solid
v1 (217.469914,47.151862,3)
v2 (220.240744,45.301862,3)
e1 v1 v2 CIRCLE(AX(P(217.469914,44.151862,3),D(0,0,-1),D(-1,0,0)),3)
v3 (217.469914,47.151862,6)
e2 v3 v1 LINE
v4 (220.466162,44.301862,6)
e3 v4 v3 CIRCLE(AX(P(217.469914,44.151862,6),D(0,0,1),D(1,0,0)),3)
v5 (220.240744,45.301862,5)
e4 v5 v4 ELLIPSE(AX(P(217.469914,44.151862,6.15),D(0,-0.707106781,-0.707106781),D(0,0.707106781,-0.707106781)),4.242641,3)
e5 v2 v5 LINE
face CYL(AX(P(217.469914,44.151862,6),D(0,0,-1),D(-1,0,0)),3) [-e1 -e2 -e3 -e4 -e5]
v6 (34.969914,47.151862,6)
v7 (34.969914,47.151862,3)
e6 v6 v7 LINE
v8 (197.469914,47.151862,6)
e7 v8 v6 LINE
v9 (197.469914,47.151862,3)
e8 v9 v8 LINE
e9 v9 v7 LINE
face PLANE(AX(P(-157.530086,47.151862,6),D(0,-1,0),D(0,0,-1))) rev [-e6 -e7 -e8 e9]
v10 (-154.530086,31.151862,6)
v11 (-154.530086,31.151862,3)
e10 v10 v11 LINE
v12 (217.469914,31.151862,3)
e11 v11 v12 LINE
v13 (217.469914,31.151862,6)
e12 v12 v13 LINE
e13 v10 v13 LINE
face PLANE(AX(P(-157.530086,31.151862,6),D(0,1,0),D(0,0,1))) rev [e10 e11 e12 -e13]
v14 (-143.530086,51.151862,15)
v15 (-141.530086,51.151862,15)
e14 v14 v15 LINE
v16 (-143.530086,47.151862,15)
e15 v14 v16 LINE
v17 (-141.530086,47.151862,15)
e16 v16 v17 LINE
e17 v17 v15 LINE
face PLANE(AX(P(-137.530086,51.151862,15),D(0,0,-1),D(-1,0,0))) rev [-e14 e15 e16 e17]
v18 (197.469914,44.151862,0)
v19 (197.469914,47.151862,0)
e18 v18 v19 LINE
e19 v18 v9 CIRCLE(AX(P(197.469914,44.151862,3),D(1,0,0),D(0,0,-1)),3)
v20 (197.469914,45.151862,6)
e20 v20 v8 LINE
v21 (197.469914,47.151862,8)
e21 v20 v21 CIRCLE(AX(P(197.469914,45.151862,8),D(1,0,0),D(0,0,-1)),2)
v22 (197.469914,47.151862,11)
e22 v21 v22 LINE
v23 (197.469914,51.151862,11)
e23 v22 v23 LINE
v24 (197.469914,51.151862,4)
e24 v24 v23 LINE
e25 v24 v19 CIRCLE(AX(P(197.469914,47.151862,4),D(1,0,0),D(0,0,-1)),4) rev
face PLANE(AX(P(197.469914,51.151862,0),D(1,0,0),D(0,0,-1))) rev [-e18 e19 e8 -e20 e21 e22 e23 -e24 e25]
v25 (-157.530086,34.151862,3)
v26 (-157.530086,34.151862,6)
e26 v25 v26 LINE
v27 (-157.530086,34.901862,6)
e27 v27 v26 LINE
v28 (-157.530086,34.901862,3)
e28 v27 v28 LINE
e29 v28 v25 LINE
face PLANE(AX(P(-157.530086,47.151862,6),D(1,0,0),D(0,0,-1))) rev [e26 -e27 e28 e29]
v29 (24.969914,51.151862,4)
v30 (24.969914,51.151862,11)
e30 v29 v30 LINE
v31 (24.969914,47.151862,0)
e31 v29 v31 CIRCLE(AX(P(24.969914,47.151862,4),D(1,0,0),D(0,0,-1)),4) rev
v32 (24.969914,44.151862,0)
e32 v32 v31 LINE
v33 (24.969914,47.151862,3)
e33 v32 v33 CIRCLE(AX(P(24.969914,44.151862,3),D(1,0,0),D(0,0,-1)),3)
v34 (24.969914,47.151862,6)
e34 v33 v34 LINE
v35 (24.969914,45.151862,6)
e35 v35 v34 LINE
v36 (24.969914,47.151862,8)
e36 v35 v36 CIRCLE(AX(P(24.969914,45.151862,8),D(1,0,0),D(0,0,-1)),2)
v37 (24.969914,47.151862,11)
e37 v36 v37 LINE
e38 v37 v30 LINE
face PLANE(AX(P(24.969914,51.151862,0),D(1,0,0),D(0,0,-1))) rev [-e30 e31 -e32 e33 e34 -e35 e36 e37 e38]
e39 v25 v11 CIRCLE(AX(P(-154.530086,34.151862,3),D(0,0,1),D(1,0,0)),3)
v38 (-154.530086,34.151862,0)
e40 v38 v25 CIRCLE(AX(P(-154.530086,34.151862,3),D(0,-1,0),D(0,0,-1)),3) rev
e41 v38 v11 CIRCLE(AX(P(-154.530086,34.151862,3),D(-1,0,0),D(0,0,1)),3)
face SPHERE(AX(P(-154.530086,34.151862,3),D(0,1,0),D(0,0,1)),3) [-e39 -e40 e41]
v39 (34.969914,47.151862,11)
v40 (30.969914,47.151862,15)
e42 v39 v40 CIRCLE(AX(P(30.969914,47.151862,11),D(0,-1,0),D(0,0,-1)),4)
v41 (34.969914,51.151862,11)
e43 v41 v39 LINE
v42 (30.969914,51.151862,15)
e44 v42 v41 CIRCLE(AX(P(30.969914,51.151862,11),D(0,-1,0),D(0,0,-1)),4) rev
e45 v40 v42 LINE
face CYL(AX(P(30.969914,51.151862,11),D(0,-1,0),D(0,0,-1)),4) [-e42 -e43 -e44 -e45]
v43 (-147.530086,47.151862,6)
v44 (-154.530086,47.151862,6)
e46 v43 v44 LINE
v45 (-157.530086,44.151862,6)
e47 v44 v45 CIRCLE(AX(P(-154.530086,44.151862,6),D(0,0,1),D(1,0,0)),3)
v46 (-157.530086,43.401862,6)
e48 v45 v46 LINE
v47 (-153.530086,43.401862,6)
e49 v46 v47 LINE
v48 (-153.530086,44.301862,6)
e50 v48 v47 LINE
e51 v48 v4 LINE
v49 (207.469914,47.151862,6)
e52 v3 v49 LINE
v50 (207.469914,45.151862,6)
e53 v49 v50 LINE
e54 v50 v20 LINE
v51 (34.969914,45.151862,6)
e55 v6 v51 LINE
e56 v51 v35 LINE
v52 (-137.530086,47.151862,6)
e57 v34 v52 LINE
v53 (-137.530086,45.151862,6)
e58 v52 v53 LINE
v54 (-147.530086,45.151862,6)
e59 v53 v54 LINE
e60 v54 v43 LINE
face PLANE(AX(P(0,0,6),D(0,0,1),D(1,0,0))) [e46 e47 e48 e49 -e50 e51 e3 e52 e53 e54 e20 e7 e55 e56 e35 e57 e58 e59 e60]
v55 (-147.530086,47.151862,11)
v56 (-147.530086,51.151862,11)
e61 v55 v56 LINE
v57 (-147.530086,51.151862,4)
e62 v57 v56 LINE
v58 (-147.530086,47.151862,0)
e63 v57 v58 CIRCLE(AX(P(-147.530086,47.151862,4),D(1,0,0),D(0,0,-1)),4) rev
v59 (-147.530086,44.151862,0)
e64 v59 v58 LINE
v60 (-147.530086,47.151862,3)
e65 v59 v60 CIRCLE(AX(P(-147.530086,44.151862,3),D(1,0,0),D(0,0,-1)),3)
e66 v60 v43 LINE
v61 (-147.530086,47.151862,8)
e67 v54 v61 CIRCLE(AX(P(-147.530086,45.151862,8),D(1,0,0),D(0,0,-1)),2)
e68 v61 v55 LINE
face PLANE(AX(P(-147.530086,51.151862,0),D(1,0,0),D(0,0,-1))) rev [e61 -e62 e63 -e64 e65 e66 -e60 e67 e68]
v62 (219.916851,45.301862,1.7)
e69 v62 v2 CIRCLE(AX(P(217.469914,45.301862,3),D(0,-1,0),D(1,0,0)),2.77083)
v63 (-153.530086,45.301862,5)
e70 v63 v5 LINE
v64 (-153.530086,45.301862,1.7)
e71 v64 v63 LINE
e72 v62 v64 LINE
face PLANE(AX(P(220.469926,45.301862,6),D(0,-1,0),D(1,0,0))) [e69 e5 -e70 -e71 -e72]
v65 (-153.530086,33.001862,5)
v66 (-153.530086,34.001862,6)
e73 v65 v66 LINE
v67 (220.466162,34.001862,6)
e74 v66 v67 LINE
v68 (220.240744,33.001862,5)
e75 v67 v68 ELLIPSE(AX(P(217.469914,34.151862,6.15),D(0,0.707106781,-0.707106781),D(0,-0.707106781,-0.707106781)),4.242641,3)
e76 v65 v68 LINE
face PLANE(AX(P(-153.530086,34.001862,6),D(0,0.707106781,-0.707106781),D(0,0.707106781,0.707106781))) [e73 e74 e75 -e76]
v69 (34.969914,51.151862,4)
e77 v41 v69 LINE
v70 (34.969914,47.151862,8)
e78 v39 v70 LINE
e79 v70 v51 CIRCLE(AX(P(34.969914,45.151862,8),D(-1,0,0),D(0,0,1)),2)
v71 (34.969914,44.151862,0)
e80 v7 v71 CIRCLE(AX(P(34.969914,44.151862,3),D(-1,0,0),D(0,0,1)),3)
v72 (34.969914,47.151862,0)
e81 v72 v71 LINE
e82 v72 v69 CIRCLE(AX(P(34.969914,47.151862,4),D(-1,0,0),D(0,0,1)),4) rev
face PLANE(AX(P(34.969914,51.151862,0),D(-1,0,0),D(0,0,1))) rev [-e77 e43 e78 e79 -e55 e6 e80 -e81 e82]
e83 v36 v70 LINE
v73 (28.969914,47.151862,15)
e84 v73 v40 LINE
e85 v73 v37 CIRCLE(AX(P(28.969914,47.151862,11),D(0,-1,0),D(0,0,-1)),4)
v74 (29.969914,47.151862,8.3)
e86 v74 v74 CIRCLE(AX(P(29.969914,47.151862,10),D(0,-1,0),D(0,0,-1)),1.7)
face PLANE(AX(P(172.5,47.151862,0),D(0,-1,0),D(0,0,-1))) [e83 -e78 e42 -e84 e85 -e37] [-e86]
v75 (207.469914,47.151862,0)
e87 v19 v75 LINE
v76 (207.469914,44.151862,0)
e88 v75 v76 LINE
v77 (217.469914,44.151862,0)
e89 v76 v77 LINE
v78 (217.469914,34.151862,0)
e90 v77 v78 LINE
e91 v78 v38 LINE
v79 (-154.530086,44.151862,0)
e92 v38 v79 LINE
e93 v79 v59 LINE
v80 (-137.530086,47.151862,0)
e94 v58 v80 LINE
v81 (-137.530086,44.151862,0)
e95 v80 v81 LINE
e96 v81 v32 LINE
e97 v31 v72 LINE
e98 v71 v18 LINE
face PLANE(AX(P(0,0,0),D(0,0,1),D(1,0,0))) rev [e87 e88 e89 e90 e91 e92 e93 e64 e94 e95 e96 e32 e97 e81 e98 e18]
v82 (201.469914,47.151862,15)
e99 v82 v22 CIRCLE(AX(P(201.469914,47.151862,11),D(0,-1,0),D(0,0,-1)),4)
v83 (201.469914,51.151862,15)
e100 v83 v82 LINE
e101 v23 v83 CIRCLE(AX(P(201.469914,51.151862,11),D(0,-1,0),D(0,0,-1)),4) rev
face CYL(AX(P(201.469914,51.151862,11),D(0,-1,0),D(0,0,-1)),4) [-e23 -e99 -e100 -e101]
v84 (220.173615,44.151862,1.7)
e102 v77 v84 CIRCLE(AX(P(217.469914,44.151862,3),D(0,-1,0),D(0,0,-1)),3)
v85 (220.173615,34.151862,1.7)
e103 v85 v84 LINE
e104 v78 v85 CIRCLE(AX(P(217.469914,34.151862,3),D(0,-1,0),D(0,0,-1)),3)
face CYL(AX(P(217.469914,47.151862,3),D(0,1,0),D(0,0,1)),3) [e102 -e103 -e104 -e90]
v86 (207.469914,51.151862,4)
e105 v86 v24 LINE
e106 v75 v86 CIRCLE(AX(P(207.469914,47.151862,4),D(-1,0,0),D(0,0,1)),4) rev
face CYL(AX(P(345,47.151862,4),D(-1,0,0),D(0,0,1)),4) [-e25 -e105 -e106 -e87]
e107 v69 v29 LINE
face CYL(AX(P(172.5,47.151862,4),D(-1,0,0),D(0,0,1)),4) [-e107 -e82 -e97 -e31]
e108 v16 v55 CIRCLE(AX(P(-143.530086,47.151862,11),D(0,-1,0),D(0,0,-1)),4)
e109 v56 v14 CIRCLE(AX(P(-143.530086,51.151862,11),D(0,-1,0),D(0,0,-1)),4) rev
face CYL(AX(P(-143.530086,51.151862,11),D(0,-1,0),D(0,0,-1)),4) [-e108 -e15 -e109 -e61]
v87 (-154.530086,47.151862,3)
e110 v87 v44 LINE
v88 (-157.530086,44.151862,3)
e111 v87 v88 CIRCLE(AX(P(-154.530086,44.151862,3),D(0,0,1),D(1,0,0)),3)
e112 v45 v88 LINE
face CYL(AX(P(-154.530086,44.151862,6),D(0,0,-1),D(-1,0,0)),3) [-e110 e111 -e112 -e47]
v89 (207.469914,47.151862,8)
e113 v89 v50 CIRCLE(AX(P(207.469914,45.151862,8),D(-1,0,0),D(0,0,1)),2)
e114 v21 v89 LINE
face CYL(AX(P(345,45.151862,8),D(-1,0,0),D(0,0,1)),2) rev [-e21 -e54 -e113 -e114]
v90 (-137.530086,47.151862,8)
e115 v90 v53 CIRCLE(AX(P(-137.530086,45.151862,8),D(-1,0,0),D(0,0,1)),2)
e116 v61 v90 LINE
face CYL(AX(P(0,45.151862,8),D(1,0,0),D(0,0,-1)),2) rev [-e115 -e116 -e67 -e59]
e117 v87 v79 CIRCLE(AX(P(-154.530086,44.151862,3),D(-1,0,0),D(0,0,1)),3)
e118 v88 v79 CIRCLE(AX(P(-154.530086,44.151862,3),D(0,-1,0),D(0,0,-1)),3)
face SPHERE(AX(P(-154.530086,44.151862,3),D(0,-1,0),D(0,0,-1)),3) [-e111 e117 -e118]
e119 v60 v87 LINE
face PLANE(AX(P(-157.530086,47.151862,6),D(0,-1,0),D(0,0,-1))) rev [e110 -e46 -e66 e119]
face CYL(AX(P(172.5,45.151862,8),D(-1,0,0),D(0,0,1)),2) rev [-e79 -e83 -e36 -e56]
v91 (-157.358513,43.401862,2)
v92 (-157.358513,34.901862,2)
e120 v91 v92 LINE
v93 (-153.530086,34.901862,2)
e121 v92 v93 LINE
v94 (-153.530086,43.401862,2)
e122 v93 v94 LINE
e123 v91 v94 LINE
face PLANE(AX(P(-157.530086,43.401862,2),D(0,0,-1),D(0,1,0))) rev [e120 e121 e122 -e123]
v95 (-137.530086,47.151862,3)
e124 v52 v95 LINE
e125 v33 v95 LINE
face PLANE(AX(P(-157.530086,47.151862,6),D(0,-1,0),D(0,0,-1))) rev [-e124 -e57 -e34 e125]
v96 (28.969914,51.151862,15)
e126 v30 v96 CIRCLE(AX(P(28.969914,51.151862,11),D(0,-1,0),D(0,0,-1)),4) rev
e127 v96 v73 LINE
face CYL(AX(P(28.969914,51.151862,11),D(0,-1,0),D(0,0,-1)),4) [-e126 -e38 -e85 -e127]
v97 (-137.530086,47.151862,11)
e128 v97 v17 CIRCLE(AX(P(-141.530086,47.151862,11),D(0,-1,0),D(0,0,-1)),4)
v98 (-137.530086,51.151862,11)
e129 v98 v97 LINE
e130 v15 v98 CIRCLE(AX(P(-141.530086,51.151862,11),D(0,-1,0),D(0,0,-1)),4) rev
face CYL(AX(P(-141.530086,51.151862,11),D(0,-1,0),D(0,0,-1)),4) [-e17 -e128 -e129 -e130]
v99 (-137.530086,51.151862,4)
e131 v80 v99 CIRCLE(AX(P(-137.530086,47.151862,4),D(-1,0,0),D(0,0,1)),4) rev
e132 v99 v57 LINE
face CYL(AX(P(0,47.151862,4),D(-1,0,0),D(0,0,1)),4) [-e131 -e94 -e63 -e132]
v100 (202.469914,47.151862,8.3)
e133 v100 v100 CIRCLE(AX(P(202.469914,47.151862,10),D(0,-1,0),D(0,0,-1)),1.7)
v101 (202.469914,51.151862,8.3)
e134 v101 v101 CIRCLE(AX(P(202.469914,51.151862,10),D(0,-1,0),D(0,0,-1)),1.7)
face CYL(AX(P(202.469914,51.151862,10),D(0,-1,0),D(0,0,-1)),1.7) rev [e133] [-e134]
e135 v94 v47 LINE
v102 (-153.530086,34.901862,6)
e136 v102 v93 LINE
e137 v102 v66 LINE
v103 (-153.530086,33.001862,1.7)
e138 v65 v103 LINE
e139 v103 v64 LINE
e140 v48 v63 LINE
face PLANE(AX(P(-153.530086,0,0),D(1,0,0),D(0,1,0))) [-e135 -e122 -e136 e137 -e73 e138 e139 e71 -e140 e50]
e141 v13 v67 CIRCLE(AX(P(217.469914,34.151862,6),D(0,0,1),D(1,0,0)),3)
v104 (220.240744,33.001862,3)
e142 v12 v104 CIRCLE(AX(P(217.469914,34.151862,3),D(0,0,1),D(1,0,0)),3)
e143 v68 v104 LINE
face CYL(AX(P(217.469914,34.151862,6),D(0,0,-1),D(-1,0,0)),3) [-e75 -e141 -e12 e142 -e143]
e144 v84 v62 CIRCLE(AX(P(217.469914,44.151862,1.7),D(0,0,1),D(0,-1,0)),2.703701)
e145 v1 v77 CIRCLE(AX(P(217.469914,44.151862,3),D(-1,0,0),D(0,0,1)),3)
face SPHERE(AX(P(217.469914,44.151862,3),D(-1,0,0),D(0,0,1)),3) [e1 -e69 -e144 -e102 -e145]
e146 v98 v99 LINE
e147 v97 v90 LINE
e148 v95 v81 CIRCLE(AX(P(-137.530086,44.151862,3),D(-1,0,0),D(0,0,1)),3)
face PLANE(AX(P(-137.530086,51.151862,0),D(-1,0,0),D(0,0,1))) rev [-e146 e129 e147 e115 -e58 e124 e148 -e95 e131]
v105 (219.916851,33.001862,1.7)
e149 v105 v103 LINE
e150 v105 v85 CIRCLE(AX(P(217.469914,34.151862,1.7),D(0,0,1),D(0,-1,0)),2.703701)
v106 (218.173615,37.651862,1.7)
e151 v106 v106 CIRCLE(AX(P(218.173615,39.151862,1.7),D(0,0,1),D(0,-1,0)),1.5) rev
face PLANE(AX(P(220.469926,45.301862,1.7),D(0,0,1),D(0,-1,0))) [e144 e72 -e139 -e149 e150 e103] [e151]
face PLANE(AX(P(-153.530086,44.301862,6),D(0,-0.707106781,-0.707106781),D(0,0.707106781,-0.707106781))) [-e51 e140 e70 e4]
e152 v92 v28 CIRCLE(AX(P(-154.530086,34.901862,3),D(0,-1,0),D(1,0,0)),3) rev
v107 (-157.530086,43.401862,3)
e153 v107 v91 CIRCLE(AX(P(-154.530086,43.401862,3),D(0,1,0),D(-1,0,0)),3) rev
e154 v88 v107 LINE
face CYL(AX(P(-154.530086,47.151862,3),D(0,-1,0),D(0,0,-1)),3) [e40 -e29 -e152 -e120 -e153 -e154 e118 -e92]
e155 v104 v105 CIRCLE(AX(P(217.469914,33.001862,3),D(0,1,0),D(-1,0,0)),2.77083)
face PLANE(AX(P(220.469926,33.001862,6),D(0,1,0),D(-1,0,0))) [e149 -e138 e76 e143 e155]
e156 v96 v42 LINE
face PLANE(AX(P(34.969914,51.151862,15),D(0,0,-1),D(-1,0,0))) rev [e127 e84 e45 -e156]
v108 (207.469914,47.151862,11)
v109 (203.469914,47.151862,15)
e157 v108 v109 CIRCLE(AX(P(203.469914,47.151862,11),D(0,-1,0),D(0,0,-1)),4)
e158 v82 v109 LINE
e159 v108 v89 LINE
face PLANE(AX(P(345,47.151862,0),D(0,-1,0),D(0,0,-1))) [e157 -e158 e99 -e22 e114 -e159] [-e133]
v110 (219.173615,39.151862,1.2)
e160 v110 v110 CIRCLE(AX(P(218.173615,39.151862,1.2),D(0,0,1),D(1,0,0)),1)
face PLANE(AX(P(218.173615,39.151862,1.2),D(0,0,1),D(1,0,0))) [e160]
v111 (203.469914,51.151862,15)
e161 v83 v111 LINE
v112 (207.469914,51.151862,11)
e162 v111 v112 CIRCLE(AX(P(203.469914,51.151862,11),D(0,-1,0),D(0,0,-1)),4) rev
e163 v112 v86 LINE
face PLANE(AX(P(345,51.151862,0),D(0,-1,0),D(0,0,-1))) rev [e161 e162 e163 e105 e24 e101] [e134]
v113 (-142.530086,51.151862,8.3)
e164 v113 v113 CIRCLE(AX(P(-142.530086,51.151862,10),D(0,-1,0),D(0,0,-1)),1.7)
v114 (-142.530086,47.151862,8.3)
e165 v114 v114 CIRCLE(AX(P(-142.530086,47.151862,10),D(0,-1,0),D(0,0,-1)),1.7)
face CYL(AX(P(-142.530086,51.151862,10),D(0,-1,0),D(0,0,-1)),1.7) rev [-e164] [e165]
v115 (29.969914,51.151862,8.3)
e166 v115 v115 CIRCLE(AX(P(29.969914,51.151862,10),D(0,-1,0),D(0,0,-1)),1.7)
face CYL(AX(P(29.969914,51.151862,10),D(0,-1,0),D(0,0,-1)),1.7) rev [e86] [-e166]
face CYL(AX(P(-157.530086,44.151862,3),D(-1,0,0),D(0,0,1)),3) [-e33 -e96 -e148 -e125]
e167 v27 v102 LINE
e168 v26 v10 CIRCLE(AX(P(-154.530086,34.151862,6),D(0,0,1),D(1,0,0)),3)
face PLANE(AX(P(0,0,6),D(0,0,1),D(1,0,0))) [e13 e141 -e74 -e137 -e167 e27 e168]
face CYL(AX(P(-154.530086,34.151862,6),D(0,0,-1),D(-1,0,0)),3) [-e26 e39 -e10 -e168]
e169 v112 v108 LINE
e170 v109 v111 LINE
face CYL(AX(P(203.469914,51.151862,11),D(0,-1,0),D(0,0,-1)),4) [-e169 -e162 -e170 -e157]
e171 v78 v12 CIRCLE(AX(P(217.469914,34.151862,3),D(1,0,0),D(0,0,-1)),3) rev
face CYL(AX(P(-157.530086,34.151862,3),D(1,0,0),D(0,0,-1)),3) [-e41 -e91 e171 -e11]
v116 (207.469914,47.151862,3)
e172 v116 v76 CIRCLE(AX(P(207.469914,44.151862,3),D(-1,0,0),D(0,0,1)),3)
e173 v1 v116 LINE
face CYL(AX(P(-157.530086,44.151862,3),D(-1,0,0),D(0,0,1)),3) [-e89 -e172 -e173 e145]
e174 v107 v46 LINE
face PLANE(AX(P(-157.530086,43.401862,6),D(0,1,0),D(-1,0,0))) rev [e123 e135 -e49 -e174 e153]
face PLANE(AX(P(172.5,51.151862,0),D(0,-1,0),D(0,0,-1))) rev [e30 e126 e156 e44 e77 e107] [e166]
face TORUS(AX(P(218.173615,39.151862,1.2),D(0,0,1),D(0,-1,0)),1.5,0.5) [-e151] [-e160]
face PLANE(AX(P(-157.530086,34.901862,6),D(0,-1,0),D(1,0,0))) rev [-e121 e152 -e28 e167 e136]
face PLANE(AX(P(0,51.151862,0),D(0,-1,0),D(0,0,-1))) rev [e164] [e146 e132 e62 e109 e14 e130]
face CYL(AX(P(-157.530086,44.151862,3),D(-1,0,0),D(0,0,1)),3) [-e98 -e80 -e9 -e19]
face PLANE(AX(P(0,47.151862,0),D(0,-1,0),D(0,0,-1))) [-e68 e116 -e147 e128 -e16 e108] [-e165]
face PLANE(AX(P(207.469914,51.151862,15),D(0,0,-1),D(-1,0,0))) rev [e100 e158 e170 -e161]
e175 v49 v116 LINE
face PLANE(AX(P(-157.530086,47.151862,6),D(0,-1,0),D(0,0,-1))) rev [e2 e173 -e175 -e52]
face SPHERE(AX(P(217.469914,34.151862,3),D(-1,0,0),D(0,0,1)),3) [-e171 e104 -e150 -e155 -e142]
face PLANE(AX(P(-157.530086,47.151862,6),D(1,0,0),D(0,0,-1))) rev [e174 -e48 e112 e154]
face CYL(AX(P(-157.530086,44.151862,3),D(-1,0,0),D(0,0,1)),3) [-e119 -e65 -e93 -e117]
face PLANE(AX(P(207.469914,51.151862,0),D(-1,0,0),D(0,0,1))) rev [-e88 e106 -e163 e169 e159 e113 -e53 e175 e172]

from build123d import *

# Parameters (mm, degrees)
SKETCH1_W               = 378
SKETCH1_H               = 16
BOSS_EXTRUDE1_DEPTH     = 6
CUT_EXTRUDE1_DEPTH      = 381.976768496
CUT_EXTRUDE1_DEPTH_BACK = 374
SKETCH3_W               = 4.3
SKETCH3_H               = 12.3
BOSS_EXTRUDE2_DEPTH     = 374
BOSS_EXTRUDE3_DEPTH     = 374
SKETCH6_W               = 4
SKETCH6_H               = 8.5
CUT_EXTRUDE2_DEPTH      = 378.00835287
FILLET2_R               = 3
SKETCH13_W              = 10
SKETCH13_H              = 15
BOSS_EXTRUDE5_DEPTH     = 4
FILLET9_R               = 3
FILLET10_R              = 4
SKETCH14_R              = 1.7
CUT_EXTRUDE5_DEPTH      = 4
FILLET11_R              = 4
FILLET12_R              = 4
LPATTERN3_COUNT         = 3
LPATTERN3_PITCH         = 172.5
LPATTERN4_COUNT         = 3
LPATTERN4_PITCH         = 172.5
FILLET13_R              = 4
FILLET14_R              = 4
FILLET15_R              = 3
FILLET16_R              = 4
FILLET17_R              = 4
FILLET18_R              = 4
FILLET19_R              = 4
FILLET20_R              = 2
FILLET21_R              = 2
FILLET22_R              = 2
FILLET23_R              = 3
SKETCH15_R              = 1
CUT_EXTRUDE6_DEPTH      = 0.5
FILLET24_R              = 0.5


# Some blends are built 0.0001 mm under size
with BuildPart() as part:
    # Sketch1 → Boss-Extrude1 (new body)
    with BuildSketch(Plane.XY):
        with Locations((31.46991404, 39.151862464)):
            Rectangle(SKETCH1_W, SKETCH1_H)
    extrude(amount=BOSS_EXTRUDE1_DEPTH)

    # Sketch3 → Cut-Extrude1 (cut, two sides: drawn at the far end of the back side and taken through both)
    with BuildSketch(Plane(origin=(220.46991404, 0, 0), x_dir=(0, 0, -1), z_dir=(1, 0, 0)).offset(-CUT_EXTRUDE1_DEPTH_BACK)):
        with Locations((-3.85, 39.151862464)):
            Rectangle(SKETCH3_W, SKETCH3_H)
    extrude(amount=CUT_EXTRUDE1_DEPTH + CUT_EXTRUDE1_DEPTH_BACK, mode=Mode.SUBTRACT)

    # Sketch4 → Boss-Extrude2 (add)
    with BuildSketch(Plane(origin=(220.46991404, 0, 0), x_dir=(0, 0, -1), z_dir=(1, 0, 0))):
        Polygon((-6, 33.001862464), (-6, 34.001862464), (-5, 33.001862464), align=None)
    extrude(amount=-BOSS_EXTRUDE2_DEPTH)

    # Sketch5 → Boss-Extrude3 (add)
    with BuildSketch(Plane(origin=(220.46991404, 0, 0), x_dir=(0, 0, -1), z_dir=(1, 0, 0))):
        Polygon((-6, 45.301862464), (-6, 44.301862464), (-5, 45.301862464), align=None)
    extrude(amount=-BOSS_EXTRUDE3_DEPTH)

    # Sketch6 → Cut-Extrude2 (cut, through all)
    with BuildSketch(Plane(origin=(-153.53008596, 0, 0), x_dir=(0, 0, -1), z_dir=(1, 0, 0))):
        with Locations((-4, 39.151862464)):
            Rectangle(SKETCH6_W, SKETCH6_H)
    extrude(amount=-CUT_EXTRUDE2_DEPTH, mode=Mode.SUBTRACT)

    # Fillet2
    # the kernel refuses this fillet: 3 mm, written as the material it takes off along each edge
    with BuildSketch(Plane(origin=(-157.53008596, 23.651862464, 0), x_dir=(0, 0, 1), z_dir=(0, 1, 0))) as fillet2_piece_1:
        with BuildLine():
            CenterArc((FILLET2_R, FILLET2_R), FILLET2_R, 180, 90)
            Line((0, FILLET2_R), (0, 0))
            Line((0, 0), (FILLET2_R, 0))
        make_face()
    extrude(amount=31, mode=Mode.SUBTRACT)

    # Sketch13 → Boss-Extrude5 (add)
    with BuildSketch(Plane(origin=(0, 47.151862464, 0), x_dir=(1, 0, 0), z_dir=(0, 1, 0))):
        with Locations((-142.53008596, -7.5)):
            Rectangle(SKETCH13_W, SKETCH13_H)
    boss_extrude5 = extrude(amount=BOSS_EXTRUDE5_DEPTH)

    # Fillet9
    fillet9_edges = [part.edges().sort_by_distance(p)[0] for p in [
        (32.96991404, 31.151862464, 0),
        (-156.651406303, 31.151862464, 0.878679656),
        (-157.53008596, 31.151862464, 4.5),
    ]]
    fillet(fillet9_edges, radius=FILLET9_R)

    # Fillet10
    fillet10_edges = [part.edges().sort_by_distance(p)[0] for p in [
        (-142.53008596, 51.151862464, 0),
    ]]
    fillet(fillet10_edges, radius=FILLET10_R)

    # Sketch14 → Cut-Extrude5 (cut)
    with BuildSketch(Plane.XZ.offset(-47.151862464)):
        with Locations(Location((-142.53008596, 10, 0), (0, 0, 270))):
            Circle(SKETCH14_R)
    cut_extrude5 = extrude(amount=-CUT_EXTRUDE5_DEPTH, mode=Mode.SUBTRACT)

    # Fillet11
    fillet11_edges = [part.edges().sort_by_distance(p)[0] for p in [
        (-137.53008596, 49.151862464, 15),
    ]]
    fillet(fillet11_edges, radius=FILLET11_R)

    # Fillet12
    fillet12_edges = [part.edges().sort_by_distance(p)[0] for p in [
        (-147.53008596, 49.151862464, 15),
    ]]
    fillet(fillet12_edges, radius=FILLET12_R)

    # LPattern3: Boss-Extrude5 ×3
    with Locations(*[(i * LPATTERN3_PITCH, 0, 0) for i in range(1, LPATTERN3_COUNT)]):
        add(boss_extrude5)

    # LPattern4: Cut-Extrude5 ×3
    with Locations(*[(i * LPATTERN4_PITCH, 0, 0) for i in range(1, LPATTERN4_COUNT)]):
        add(cut_extrude5, mode=Mode.SUBTRACT)

    # Fillet13
    fillet13_edges = [part.edges().sort_by_distance(p)[0] for p in [
        (29.96991404, 51.151862464, 0),
    ]]
    fillet(fillet13_edges, radius=FILLET13_R)

    # Fillet14
    fillet14_edges = [part.edges().sort_by_distance(p)[0] for p in [
        (202.46991404, 51.151862464, 0),
    ]]
    fillet(fillet14_edges, radius=FILLET14_R)

    # Fillet15
    # the kernel refuses this fillet: 3 mm, written as the material it takes off along each edge
    with BuildSketch(Plane(origin=(34.96991404, 47.151862464, 0), x_dir=(0, -1, 0), z_dir=(1, 0, 0)), Plane(origin=(-137.53008596, 47.151862464, 0), x_dir=(0, -1, 0), z_dir=(1, 0, 0))) as fillet15_piece_1:
        with BuildLine():
            CenterArc((FILLET15_R, -FILLET15_R), FILLET15_R, 90, 90)
            Line((0, -FILLET15_R), (0, 0))
            Line((0, 0), (FILLET15_R, 0))
        make_face()
    extrude(amount=162.5, mode=Mode.SUBTRACT)
    with BuildSketch(Plane(origin=(207.46991404, 47.151862464, 0), x_dir=(0, -1, 0), z_dir=(1, 0, 0))) as fillet15_piece_2:
        with BuildLine():
            CenterArc((FILLET15_R, -FILLET15_R), FILLET15_R, 90, 90)
            Line((0, -FILLET15_R), (0, 0))
            Line((0, 0), (FILLET15_R, 0))
        make_face()
    extrude(amount=20.5, mode=Mode.SUBTRACT)
    with BuildSketch(Plane(origin=(-157.53008596, 47.151862464, 3), x_dir=(1, 0, 0), z_dir=(0, 0, 1))) as fillet15_piece_3:
        with BuildLine():
            CenterArc((FILLET15_R, -FILLET15_R), FILLET15_R, 90, 90)
            Line((0, -FILLET15_R), (0, 0))
            Line((0, 0), (FILLET15_R, 0))
        make_face()
    extrude(amount=10.5, mode=Mode.SUBTRACT)
    with BuildSketch(Plane(origin=(-154.53008596, 47.151862464, 3), x_dir=(-1, 0, 0), z_dir=(0, 0, 1))) as fillet15_piece_4:
        with BuildLine():
            CenterArc((3 - FILLET15_R, FILLET15_R), FILLET15_R, 270, 90)
            Line((3 - FILLET15_R, 0), (3, 0))
            Line((3, 0), (3, FILLET15_R))
        make_face()
    revolve(axis=Axis((-154.53008596, 47.151862464, 3), (0, -1, 0)), revolution_arc=90, mode=Mode.SUBTRACT)
    with BuildSketch(Plane(origin=(-154.53008596, 47.151862464, 0), x_dir=(0, -1, 0), z_dir=(1, 0, 0))) as fillet15_piece_5:
        with BuildLine():
            CenterArc((FILLET15_R, -FILLET15_R), FILLET15_R, 90, 90)
            Line((0, -FILLET15_R), (0, 0))
            Line((0, 0), (FILLET15_R, 0))
        make_face()
    extrude(amount=7, mode=Mode.SUBTRACT)

    # Fillet16
    fillet16_edges = [part.edges().sort_by_distance(p)[0] for p in [
        (24.96991404, 49.151862464, 15),
    ]]
    fillet(fillet16_edges, radius=FILLET16_R)

    # Fillet17
    fillet17_edges = [part.edges().sort_by_distance(p)[0] for p in [
        (34.96991404, 49.151862464, 15),
    ]]
    fillet(fillet17_edges, radius=FILLET17_R)

    # Fillet18
    fillet18_edges = [part.edges().sort_by_distance(p)[0] for p in [
        (207.46991404, 49.151862464, 15),
    ]]
    fillet(fillet18_edges, radius=FILLET18_R)

    # Fillet19
    fillet19_edges = [part.edges().sort_by_distance(p)[0] for p in [
        (197.46991404, 49.151862464, 15),
    ]]
    fillet(fillet19_edges, radius=FILLET19_R)

    # Fillet20
    fillet20_edges = [part.edges().sort_by_distance(p)[0] for p in [
        (202.46991404, 47.151862464, 6),
    ]]
    fillet(fillet20_edges, radius=FILLET20_R)

    # Fillet21
    fillet21_edges = [part.edges().sort_by_distance(p)[0] for p in [
        (29.96991404, 47.151862464, 6),
    ]]
    fillet(fillet21_edges, radius=FILLET21_R)

    # Fillet22
    fillet22_edges = [part.edges().sort_by_distance(p)[0] for p in [
        (-142.53008596, 47.151862464, 6),
    ]]
    fillet(fillet22_edges, radius=FILLET22_R)

    # Fillet23
    # the kernel refuses this fillet: 3 mm, written as the material it takes off along each edge
    with BuildSketch(Plane(origin=(220.46991404, 31.151862464, 3), x_dir=(0, 1, 0), z_dir=(0, 0, 1))) as fillet23_piece_1:
        with BuildLine():
            CenterArc((FILLET23_R, FILLET23_R), FILLET23_R, 180, 90)
            Line((0, FILLET23_R), (0, 0))
            Line((0, 0), (FILLET23_R, 0))
        make_face()
    extrude(amount=10.5, mode=Mode.SUBTRACT)
    with BuildSketch(Plane(origin=(220.46991404, 34.151862464, 3), x_dir=(0, 0, -1), z_dir=(0, 1, 0))) as fillet23_piece_2:
        with BuildLine():
            CenterArc((3 - FILLET23_R, FILLET23_R), FILLET23_R, 270, 90)
            Line((3, FILLET23_R), (3, 0))
            Line((3, 0), (3 - FILLET23_R, 0))
        make_face()
    revolve(axis=Axis((220.46991404, 34.151862464, 3), (-1, 0, 0)), revolution_arc=90, mode=Mode.SUBTRACT)
    with BuildSketch(Plane(origin=(220.46991404, 47.151862464, 3), x_dir=(0, -1, 0), z_dir=(0, 0, 1))) as fillet23_piece_3:
        with BuildLine():
            CenterArc((FILLET23_R, -FILLET23_R), FILLET23_R, 90, 90)
            Line((0, -FILLET23_R), (0, 0))
            Line((0, 0), (FILLET23_R, 0))
        make_face()
    extrude(amount=10.5, mode=Mode.SUBTRACT)
    with BuildSketch(Plane(origin=(220.46991404, 44.151862464, 3), x_dir=(0, 1, 0), z_dir=(0, 0, 1))) as fillet23_piece_4:
        with BuildLine():
            CenterArc((3 - FILLET23_R, FILLET23_R), FILLET23_R, 270, 90)
            Line((3, FILLET23_R), (3, 0))
            Line((3, 0), (3 - FILLET23_R, 0))
        make_face()
    revolve(axis=Axis((220.46991404, 44.151862464, 3), (-1, 0, 0)), revolution_arc=90, mode=Mode.SUBTRACT)
    with BuildSketch(Plane(origin=(220.46991404, 44.151862464, 0), x_dir=(0, 0, 1), z_dir=(0, -1, 0))) as fillet23_piece_5:
        with BuildLine():
            CenterArc((FILLET23_R, FILLET23_R), FILLET23_R, 180, 90)
            Line((0, FILLET23_R), (0, 0))
            Line((0, 0), (FILLET23_R, 0))
        make_face()
    extrude(amount=10, mode=Mode.SUBTRACT)

    # Sketch15 → Cut-Extrude6 (cut)
    with BuildSketch(Plane.XY.offset(1.7)):
        with Locations((218.173615207, 39.151862464)):
            Circle(SKETCH15_R)
    extrude(amount=-CUT_EXTRUDE6_DEPTH, mode=Mode.SUBTRACT)

    # Fillet24
    fillet24_edges = [part.edges().sort_by_distance(p)[0] for p in [
        (217.173615207, 39.151862464, 1.7),
    ]]
    fillet(fillet24_edges, radius=FILLET24_R - 0.0001)  # a hair under: the kernel refuses the full size


solid = part.part
